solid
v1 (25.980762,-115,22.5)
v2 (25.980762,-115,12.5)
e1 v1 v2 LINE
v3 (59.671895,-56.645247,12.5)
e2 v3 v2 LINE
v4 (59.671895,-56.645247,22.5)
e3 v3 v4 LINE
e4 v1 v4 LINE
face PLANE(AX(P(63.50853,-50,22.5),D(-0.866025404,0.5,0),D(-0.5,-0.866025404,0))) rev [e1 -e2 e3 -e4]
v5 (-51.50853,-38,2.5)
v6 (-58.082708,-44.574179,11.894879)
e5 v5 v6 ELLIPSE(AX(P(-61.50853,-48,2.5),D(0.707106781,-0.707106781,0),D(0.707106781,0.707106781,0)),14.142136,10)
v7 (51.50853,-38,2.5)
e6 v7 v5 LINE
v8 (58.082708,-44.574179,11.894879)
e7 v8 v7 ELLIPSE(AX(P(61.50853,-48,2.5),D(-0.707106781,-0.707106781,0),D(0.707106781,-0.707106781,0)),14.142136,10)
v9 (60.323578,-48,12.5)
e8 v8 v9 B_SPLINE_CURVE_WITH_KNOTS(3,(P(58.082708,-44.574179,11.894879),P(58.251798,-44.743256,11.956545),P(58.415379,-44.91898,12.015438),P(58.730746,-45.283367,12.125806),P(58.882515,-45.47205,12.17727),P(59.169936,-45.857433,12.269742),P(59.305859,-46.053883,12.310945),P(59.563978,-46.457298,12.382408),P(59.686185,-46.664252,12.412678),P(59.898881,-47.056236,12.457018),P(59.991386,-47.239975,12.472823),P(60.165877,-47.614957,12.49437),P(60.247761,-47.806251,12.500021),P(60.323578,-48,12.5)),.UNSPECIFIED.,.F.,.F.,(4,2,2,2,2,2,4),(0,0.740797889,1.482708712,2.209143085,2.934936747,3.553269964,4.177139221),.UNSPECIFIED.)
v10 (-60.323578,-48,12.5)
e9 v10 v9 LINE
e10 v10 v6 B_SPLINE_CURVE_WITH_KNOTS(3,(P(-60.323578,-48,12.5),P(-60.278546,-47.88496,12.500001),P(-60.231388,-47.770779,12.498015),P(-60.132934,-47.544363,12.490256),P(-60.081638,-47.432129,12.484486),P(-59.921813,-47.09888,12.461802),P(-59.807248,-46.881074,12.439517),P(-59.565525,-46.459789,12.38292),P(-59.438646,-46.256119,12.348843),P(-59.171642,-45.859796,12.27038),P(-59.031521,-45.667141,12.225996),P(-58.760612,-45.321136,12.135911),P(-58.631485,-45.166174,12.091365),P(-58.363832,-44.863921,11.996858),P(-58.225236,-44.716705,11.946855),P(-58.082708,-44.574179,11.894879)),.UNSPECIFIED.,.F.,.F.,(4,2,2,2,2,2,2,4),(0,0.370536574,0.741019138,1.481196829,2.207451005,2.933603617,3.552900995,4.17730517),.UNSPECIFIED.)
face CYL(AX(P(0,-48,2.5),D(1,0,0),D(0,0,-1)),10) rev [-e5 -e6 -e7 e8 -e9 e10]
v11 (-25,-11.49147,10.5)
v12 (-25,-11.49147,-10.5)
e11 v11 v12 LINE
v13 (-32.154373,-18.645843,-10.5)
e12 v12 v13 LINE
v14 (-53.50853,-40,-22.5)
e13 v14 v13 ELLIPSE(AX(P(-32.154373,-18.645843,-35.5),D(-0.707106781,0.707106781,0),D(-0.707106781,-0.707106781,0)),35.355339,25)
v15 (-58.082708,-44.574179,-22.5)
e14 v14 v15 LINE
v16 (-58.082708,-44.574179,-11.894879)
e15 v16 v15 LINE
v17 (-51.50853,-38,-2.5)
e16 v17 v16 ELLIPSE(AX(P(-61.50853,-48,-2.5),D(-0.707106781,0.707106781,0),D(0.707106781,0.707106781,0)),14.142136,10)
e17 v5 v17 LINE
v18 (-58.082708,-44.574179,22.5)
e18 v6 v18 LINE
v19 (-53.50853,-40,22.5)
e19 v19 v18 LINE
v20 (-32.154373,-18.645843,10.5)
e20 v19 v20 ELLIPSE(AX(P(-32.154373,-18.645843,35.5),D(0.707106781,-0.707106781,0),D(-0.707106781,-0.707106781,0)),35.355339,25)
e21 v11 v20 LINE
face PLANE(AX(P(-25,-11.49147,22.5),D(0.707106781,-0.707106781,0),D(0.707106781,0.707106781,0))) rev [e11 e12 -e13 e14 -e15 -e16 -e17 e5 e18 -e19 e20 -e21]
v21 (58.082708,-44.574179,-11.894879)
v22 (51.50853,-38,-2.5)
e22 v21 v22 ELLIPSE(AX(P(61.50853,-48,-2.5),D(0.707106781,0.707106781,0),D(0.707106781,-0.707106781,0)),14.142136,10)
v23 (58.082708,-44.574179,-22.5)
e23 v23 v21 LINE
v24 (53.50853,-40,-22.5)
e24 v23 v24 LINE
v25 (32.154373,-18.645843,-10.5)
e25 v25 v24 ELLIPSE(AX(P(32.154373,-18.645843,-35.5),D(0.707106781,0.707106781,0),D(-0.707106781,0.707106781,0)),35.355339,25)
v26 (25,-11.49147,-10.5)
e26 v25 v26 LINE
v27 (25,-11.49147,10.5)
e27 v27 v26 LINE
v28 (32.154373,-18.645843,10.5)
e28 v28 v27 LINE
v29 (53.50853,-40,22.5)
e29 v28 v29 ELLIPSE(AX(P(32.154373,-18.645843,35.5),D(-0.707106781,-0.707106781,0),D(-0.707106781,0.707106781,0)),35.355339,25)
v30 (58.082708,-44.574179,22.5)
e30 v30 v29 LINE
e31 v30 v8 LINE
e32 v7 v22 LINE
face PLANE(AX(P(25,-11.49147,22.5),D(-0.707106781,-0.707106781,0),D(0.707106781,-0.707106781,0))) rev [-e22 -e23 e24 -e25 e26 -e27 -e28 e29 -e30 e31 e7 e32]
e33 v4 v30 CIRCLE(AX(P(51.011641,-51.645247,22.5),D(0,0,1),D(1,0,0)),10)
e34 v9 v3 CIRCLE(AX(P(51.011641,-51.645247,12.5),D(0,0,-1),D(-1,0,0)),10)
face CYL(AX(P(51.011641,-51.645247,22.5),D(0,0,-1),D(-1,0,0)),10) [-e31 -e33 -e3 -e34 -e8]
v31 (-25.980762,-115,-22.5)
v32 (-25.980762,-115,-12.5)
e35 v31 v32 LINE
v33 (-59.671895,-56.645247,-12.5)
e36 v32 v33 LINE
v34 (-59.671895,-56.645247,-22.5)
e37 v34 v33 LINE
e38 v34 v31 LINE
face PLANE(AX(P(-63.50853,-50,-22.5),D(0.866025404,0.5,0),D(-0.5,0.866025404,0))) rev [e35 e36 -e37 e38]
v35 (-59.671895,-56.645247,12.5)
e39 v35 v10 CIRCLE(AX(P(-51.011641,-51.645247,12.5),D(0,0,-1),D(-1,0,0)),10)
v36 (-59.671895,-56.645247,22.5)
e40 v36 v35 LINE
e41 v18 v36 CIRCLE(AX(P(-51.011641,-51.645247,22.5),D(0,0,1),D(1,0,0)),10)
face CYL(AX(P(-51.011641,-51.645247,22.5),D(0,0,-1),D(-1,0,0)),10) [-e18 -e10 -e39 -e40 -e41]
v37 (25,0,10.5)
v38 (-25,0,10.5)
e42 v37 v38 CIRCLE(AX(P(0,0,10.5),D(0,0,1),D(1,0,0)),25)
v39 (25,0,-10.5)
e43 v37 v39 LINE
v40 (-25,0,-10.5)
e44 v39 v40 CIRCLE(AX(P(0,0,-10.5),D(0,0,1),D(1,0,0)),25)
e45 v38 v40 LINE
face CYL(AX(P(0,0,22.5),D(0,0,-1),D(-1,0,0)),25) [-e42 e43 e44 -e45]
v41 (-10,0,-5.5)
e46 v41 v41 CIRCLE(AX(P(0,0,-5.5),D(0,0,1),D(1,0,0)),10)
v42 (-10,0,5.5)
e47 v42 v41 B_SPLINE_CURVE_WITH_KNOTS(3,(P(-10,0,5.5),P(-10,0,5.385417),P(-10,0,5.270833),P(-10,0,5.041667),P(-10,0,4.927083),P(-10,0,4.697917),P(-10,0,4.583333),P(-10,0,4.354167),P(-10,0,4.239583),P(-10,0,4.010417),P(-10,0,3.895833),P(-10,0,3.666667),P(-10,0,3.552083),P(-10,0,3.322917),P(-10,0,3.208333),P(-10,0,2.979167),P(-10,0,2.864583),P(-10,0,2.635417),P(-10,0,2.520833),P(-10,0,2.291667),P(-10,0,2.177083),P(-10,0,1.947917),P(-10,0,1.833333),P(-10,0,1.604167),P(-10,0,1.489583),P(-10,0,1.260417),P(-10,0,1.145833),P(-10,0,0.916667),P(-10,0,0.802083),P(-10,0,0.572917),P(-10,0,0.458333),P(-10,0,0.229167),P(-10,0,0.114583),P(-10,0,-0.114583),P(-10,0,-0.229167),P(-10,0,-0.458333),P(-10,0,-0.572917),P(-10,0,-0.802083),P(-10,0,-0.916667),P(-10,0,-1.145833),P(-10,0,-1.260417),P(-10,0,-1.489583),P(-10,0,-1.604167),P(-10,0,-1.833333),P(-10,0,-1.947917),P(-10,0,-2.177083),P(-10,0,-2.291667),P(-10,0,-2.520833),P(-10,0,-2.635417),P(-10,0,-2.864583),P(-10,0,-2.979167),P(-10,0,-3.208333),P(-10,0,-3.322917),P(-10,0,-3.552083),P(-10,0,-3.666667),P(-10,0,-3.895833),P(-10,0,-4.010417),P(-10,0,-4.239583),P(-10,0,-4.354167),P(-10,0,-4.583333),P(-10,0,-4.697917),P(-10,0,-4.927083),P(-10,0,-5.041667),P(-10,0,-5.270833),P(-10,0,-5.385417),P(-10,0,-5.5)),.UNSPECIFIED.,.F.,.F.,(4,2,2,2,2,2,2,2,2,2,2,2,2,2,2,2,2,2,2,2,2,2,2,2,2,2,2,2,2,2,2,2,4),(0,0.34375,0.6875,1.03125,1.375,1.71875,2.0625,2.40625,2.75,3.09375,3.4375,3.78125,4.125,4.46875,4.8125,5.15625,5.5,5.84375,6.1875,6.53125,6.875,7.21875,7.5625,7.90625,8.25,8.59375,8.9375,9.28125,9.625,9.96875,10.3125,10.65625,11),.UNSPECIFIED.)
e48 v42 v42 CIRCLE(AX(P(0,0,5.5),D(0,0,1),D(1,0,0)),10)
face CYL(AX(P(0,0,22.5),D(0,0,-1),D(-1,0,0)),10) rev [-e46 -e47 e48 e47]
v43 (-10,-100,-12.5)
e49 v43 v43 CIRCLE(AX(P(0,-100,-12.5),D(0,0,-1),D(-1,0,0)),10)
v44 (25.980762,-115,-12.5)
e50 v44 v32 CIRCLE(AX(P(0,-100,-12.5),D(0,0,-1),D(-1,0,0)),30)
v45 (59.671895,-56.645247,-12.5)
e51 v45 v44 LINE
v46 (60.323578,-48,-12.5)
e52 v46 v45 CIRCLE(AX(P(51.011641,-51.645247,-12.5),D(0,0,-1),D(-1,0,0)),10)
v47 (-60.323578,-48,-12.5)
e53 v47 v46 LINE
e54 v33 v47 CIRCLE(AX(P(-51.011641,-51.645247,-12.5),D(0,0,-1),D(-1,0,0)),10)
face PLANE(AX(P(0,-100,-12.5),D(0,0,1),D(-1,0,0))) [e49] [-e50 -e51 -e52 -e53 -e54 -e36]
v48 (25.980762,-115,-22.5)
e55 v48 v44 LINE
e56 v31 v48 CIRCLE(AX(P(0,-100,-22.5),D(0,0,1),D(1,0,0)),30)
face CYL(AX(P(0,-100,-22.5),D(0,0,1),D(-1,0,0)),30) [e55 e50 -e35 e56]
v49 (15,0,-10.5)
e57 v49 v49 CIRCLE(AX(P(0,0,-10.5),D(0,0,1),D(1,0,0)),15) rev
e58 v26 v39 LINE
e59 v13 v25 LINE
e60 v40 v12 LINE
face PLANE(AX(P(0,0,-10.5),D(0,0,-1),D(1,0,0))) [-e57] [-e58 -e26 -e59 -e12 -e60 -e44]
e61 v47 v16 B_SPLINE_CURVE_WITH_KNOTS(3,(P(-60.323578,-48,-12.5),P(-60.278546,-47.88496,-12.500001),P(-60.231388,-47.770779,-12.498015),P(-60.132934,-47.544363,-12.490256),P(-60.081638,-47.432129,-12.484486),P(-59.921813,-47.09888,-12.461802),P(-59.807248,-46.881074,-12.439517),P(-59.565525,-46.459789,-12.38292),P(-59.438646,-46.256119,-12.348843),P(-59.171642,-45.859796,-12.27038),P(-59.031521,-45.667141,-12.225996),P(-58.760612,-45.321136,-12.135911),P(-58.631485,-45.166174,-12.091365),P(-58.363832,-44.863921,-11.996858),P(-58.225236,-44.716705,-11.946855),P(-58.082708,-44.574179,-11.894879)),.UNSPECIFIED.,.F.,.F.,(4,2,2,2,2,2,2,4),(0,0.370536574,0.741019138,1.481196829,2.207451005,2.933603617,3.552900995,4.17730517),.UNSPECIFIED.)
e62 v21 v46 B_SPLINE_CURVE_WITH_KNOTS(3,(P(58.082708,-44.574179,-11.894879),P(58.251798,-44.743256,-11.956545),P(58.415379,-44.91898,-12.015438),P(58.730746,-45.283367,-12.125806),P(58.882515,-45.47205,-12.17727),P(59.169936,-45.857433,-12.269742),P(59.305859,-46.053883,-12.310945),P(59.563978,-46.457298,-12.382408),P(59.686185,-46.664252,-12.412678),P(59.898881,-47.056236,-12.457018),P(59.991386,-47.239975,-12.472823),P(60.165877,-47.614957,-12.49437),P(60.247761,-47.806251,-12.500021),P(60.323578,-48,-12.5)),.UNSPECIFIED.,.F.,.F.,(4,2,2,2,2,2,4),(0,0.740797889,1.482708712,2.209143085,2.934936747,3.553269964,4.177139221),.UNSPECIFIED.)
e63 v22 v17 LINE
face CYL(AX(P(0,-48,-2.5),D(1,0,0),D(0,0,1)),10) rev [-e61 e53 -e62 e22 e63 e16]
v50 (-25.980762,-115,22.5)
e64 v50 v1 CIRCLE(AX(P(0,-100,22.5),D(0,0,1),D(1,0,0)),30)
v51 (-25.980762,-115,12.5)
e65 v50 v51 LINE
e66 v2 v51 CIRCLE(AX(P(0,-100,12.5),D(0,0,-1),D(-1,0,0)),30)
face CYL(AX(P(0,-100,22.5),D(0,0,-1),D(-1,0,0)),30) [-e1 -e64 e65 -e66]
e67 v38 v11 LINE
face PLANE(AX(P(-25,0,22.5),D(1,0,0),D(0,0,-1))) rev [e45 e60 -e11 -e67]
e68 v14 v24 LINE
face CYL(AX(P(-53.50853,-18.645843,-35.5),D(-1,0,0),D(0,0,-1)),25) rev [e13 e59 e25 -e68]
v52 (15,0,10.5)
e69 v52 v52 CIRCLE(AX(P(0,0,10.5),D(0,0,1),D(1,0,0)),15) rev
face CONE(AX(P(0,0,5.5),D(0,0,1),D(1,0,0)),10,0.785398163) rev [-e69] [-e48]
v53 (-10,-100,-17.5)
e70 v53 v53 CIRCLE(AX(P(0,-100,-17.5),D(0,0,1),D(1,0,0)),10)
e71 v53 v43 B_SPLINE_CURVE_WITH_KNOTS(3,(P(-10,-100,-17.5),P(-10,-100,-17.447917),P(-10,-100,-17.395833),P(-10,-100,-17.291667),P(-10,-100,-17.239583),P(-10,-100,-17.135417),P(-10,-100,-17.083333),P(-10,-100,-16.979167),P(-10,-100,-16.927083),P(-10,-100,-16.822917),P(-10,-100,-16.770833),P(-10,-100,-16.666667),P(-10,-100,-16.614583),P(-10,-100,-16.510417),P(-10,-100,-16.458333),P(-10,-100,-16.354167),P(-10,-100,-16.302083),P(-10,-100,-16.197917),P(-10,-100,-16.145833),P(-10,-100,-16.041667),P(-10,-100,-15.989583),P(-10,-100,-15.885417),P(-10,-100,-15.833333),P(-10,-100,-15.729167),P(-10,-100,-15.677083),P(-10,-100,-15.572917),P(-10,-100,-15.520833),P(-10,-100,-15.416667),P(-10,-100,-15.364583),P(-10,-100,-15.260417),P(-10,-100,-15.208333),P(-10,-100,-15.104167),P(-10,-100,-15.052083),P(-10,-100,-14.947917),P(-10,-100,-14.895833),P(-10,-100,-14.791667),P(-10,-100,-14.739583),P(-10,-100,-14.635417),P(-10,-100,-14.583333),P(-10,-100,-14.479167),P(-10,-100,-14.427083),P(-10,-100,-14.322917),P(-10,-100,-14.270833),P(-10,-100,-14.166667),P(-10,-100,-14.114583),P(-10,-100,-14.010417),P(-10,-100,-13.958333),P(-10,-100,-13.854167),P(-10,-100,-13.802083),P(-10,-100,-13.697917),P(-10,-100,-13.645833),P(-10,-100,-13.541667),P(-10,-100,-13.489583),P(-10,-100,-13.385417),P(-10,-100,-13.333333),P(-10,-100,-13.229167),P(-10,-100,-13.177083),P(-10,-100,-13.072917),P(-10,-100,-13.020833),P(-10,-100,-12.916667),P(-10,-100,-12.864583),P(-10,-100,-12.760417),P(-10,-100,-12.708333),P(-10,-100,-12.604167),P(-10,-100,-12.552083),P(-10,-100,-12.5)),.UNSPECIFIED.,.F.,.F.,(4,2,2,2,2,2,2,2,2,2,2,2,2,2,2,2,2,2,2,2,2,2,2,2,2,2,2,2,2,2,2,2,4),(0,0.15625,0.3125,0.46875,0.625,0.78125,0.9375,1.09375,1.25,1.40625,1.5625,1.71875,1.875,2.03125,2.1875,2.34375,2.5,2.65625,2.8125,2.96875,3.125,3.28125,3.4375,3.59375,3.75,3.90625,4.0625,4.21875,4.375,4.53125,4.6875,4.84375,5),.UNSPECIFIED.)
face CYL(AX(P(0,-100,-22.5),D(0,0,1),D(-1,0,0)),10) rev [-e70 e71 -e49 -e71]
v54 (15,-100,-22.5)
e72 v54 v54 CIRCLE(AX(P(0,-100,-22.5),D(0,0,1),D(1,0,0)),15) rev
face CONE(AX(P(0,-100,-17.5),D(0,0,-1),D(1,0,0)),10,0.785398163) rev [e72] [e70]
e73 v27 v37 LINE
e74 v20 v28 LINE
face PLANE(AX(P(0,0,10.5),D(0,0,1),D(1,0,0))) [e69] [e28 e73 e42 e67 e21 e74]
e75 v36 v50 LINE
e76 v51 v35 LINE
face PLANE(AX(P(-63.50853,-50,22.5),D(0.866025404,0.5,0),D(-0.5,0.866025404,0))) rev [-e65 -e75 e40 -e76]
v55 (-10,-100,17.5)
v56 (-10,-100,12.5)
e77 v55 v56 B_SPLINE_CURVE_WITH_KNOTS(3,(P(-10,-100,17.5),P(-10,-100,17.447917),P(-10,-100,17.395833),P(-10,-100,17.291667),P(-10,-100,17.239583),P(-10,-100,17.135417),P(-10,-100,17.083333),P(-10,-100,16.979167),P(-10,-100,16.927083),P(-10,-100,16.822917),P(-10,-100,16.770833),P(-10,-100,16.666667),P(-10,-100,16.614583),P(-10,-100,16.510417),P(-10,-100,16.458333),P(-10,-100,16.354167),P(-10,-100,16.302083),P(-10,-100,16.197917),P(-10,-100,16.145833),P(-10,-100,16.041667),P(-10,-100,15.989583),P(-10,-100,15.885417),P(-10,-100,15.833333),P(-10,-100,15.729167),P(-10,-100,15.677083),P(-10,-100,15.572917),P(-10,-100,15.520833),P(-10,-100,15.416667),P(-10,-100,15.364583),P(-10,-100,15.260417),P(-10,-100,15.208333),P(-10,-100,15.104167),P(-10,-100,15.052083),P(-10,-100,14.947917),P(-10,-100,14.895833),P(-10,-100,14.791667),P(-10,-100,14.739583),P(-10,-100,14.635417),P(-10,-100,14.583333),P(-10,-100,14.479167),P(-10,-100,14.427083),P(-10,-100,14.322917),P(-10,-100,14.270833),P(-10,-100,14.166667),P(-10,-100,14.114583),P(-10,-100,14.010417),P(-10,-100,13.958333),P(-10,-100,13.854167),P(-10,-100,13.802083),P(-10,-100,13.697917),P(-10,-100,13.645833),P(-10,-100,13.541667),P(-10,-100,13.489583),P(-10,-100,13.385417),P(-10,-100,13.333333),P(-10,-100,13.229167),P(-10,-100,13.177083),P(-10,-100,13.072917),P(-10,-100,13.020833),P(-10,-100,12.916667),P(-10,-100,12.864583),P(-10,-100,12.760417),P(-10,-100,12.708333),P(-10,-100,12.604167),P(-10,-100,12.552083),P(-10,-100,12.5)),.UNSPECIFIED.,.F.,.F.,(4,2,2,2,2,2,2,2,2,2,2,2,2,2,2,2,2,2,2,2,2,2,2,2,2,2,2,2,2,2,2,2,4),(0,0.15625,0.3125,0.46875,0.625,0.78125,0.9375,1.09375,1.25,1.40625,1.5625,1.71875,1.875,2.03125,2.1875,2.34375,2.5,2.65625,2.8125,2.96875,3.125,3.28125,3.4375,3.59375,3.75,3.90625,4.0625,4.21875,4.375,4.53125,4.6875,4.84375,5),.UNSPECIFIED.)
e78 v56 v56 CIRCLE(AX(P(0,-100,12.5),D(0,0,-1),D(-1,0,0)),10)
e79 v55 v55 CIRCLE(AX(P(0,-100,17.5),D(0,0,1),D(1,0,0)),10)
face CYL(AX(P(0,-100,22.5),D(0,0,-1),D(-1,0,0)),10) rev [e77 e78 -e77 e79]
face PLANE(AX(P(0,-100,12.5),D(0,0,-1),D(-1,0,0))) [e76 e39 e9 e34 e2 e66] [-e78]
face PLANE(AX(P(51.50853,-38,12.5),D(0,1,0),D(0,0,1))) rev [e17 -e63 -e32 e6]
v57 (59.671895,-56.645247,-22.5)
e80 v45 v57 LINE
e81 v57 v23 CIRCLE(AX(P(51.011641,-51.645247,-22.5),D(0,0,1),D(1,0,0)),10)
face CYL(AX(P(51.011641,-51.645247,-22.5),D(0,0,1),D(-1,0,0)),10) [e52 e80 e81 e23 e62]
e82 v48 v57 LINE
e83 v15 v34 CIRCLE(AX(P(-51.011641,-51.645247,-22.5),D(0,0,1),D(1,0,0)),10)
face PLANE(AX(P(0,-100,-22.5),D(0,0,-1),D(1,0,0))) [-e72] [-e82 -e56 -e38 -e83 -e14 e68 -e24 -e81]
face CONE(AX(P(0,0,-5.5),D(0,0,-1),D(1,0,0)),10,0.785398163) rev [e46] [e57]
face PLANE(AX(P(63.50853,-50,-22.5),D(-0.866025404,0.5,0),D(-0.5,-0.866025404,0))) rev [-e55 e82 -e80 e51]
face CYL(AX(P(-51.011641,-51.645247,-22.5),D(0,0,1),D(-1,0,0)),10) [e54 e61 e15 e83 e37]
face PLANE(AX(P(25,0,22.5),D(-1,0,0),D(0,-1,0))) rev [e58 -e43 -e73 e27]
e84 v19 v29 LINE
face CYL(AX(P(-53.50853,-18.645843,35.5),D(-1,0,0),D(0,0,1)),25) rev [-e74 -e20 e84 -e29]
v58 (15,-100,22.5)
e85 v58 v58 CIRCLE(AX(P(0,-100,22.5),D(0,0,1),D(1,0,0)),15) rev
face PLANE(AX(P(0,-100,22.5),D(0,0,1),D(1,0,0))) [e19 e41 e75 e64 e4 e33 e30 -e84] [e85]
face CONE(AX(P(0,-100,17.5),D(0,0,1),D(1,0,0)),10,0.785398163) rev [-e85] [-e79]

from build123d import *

# Parameters (mm, degrees)
SKETCH2_R           = 10
BOSS_EXTRUDE2_DEPTH = 22.5
CUT_EXTRUDE4_START  = -12
CUT_EXTRUDE4_DEPTH  = 12
FILLET7_R           = 25
CUT_EXTRUDE5_DEPTH  = 12.5
FILLET8_R           = 10
FILLET9_R           = 10
CHAMFER5_SIZE       = 5


with BuildPart() as part:
    # Sketch2 → Boss-Extrude2 (new body)
    with BuildSketch(Plane.XY):
        with BuildLine():
            Line((-25, 0), (-25, -11.491470389))
            Line((-25, -11.491470389), (-63.508529611, -50))
            Line((-63.508529611, -50), (-25.980762114, -115))
            ThreePointArc((-25.980762114, -115), (0, -130), (25.980762114, -115))
            Line((25.980762114, -115), (63.508529611, -50))
            Line((63.508529611, -50), (25, -11.491470389))
            Line((25, -11.491470389), (25, 0))
            ThreePointArc((25, 0), (0, 25), (-25, 0))
        make_face()
        with Locations(Location((0, 0, 0), (0, 0, 180))):
            Circle(SKETCH2_R, mode=Mode.SUBTRACT)
        with Locations(Location((0, -100, 0), (0, 0, 180))):
            Circle(SKETCH2_R, mode=Mode.SUBTRACT)
    extrude(amount=BOSS_EXTRUDE2_DEPTH)

    # Sketch7 → Cut-Extrude4 (cut)
    with BuildSketch(Plane.XY.offset(22.5).offset(CUT_EXTRUDE4_START)):
        with BuildLine():
            Line((-25, -11.491470389), (-53.508529611, -40))
            Line((-53.508529611, -40), (53.508529611, -40))
            Line((53.508529611, -40), (25, -11.491470389))
            Line((25, -11.491470389), (25, 0))
            ThreePointArc((25, 0), (0, 25), (-25, 0))
            Line((-25, 0), (-25, -11.491470389))
        make_face()
    extrude(amount=CUT_EXTRUDE4_DEPTH, mode=Mode.SUBTRACT)

    # Fillet7
    # the kernel refuses this fillet: 25 mm, written as the material it adds along each edge
    with BuildSketch(Plane(origin=(-106.893920871, -40, 10.5), x_dir=(0, 1, 0), z_dir=(1, 0, 0))) as fillet7_piece_1_section:
        with BuildLine():
            CenterArc((21.354156504, 25), FILLET7_R, 211.332251498, 58.667748502)
            Line((0, 12), (-0.42708313, 11.74))
            ThreePointArc((-0.42708313, 11.74), (-0.5, 6), (-0.5, 0))
            Line((-0.5, 0), (0, -0.5))
            Line((0, -0.5), (21.354156504, -0.5))
            Line((21.354156504, -0.5), (21.354156504, 0))
        make_face()
    fillet7_piece_1 = extrude(amount=213.787841742, mode=Mode.PRIVATE)
    fillet7_piece_1 = split(fillet7_piece_1, bisect_by=Plane(origin=(-24.314247143, -10.805717532, 13.775046533), z_dir=(0.7071067811865464, -0.7071067811865488, 0)), keep=Keep.TOP, mode=Mode.PRIVATE)
    fillet7_piece_1 = split(fillet7_piece_1, bisect_by=Plane(origin=(24.314247143, -10.805717532, 13.775046533), z_dir=(-0.7071067811865461, -0.7071067811865489, 0)), keep=Keep.TOP, mode=Mode.PRIVATE)
    add(fillet7_piece_1)

    # Sketch8 → Cut-Extrude5 (cut)
    with BuildSketch(Plane(origin=(0, 0, 0), x_dir=(-1, 0, 0), z_dir=(0, 0, -1))):
        with BuildLine():
            Line((-51.508529611, -38), (51.508529611, -38))
            Line((51.508529611, -38), (63.508529611, -50))
            Line((63.508529611, -50), (25.980762114, -115))
            ThreePointArc((25.980762114, -115), (0, -130), (-25.980762114, -115))
            Line((-25.980762114, -115), (-63.508529611, -50))
            Line((-63.508529611, -50), (-51.508529611, -38))
        make_face()
    extrude(amount=-CUT_EXTRUDE5_DEPTH, mode=Mode.SUBTRACT)

    # Fillet8
    fillet8_edges = [part.edges().sort_by_distance(p)[0] for p in [
        (0, -38, 12.5),
    ]]
    fillet(fillet8_edges, radius=FILLET8_R)

    # Fillet9
    fillet9_edges = [part.edges().sort_by_distance(p)[0] for p in [
        (-63.508529611, -50, 17.5),
        (63.508529611, -50, 17.5),
    ]]
    fillet(fillet9_edges, radius=FILLET9_R)

    # Chamfer5
    chamfer5_edges = [part.edges().sort_by_distance(p)[0] for p in [
        (10, -100, 22.5),
        (10, 0, 10.5),
    ]]
    chamfer(chamfer5_edges, length=CHAMFER5_SIZE)

    # Mirror3: part across plane


with BuildPart() as part_1:
    add(part.part)
    add(part.part.mirror(Plane(origin=(0, -100, 0), x_dir=(1, 0, 0), z_dir=(0, 0, 1))))


solid = part_1.part
